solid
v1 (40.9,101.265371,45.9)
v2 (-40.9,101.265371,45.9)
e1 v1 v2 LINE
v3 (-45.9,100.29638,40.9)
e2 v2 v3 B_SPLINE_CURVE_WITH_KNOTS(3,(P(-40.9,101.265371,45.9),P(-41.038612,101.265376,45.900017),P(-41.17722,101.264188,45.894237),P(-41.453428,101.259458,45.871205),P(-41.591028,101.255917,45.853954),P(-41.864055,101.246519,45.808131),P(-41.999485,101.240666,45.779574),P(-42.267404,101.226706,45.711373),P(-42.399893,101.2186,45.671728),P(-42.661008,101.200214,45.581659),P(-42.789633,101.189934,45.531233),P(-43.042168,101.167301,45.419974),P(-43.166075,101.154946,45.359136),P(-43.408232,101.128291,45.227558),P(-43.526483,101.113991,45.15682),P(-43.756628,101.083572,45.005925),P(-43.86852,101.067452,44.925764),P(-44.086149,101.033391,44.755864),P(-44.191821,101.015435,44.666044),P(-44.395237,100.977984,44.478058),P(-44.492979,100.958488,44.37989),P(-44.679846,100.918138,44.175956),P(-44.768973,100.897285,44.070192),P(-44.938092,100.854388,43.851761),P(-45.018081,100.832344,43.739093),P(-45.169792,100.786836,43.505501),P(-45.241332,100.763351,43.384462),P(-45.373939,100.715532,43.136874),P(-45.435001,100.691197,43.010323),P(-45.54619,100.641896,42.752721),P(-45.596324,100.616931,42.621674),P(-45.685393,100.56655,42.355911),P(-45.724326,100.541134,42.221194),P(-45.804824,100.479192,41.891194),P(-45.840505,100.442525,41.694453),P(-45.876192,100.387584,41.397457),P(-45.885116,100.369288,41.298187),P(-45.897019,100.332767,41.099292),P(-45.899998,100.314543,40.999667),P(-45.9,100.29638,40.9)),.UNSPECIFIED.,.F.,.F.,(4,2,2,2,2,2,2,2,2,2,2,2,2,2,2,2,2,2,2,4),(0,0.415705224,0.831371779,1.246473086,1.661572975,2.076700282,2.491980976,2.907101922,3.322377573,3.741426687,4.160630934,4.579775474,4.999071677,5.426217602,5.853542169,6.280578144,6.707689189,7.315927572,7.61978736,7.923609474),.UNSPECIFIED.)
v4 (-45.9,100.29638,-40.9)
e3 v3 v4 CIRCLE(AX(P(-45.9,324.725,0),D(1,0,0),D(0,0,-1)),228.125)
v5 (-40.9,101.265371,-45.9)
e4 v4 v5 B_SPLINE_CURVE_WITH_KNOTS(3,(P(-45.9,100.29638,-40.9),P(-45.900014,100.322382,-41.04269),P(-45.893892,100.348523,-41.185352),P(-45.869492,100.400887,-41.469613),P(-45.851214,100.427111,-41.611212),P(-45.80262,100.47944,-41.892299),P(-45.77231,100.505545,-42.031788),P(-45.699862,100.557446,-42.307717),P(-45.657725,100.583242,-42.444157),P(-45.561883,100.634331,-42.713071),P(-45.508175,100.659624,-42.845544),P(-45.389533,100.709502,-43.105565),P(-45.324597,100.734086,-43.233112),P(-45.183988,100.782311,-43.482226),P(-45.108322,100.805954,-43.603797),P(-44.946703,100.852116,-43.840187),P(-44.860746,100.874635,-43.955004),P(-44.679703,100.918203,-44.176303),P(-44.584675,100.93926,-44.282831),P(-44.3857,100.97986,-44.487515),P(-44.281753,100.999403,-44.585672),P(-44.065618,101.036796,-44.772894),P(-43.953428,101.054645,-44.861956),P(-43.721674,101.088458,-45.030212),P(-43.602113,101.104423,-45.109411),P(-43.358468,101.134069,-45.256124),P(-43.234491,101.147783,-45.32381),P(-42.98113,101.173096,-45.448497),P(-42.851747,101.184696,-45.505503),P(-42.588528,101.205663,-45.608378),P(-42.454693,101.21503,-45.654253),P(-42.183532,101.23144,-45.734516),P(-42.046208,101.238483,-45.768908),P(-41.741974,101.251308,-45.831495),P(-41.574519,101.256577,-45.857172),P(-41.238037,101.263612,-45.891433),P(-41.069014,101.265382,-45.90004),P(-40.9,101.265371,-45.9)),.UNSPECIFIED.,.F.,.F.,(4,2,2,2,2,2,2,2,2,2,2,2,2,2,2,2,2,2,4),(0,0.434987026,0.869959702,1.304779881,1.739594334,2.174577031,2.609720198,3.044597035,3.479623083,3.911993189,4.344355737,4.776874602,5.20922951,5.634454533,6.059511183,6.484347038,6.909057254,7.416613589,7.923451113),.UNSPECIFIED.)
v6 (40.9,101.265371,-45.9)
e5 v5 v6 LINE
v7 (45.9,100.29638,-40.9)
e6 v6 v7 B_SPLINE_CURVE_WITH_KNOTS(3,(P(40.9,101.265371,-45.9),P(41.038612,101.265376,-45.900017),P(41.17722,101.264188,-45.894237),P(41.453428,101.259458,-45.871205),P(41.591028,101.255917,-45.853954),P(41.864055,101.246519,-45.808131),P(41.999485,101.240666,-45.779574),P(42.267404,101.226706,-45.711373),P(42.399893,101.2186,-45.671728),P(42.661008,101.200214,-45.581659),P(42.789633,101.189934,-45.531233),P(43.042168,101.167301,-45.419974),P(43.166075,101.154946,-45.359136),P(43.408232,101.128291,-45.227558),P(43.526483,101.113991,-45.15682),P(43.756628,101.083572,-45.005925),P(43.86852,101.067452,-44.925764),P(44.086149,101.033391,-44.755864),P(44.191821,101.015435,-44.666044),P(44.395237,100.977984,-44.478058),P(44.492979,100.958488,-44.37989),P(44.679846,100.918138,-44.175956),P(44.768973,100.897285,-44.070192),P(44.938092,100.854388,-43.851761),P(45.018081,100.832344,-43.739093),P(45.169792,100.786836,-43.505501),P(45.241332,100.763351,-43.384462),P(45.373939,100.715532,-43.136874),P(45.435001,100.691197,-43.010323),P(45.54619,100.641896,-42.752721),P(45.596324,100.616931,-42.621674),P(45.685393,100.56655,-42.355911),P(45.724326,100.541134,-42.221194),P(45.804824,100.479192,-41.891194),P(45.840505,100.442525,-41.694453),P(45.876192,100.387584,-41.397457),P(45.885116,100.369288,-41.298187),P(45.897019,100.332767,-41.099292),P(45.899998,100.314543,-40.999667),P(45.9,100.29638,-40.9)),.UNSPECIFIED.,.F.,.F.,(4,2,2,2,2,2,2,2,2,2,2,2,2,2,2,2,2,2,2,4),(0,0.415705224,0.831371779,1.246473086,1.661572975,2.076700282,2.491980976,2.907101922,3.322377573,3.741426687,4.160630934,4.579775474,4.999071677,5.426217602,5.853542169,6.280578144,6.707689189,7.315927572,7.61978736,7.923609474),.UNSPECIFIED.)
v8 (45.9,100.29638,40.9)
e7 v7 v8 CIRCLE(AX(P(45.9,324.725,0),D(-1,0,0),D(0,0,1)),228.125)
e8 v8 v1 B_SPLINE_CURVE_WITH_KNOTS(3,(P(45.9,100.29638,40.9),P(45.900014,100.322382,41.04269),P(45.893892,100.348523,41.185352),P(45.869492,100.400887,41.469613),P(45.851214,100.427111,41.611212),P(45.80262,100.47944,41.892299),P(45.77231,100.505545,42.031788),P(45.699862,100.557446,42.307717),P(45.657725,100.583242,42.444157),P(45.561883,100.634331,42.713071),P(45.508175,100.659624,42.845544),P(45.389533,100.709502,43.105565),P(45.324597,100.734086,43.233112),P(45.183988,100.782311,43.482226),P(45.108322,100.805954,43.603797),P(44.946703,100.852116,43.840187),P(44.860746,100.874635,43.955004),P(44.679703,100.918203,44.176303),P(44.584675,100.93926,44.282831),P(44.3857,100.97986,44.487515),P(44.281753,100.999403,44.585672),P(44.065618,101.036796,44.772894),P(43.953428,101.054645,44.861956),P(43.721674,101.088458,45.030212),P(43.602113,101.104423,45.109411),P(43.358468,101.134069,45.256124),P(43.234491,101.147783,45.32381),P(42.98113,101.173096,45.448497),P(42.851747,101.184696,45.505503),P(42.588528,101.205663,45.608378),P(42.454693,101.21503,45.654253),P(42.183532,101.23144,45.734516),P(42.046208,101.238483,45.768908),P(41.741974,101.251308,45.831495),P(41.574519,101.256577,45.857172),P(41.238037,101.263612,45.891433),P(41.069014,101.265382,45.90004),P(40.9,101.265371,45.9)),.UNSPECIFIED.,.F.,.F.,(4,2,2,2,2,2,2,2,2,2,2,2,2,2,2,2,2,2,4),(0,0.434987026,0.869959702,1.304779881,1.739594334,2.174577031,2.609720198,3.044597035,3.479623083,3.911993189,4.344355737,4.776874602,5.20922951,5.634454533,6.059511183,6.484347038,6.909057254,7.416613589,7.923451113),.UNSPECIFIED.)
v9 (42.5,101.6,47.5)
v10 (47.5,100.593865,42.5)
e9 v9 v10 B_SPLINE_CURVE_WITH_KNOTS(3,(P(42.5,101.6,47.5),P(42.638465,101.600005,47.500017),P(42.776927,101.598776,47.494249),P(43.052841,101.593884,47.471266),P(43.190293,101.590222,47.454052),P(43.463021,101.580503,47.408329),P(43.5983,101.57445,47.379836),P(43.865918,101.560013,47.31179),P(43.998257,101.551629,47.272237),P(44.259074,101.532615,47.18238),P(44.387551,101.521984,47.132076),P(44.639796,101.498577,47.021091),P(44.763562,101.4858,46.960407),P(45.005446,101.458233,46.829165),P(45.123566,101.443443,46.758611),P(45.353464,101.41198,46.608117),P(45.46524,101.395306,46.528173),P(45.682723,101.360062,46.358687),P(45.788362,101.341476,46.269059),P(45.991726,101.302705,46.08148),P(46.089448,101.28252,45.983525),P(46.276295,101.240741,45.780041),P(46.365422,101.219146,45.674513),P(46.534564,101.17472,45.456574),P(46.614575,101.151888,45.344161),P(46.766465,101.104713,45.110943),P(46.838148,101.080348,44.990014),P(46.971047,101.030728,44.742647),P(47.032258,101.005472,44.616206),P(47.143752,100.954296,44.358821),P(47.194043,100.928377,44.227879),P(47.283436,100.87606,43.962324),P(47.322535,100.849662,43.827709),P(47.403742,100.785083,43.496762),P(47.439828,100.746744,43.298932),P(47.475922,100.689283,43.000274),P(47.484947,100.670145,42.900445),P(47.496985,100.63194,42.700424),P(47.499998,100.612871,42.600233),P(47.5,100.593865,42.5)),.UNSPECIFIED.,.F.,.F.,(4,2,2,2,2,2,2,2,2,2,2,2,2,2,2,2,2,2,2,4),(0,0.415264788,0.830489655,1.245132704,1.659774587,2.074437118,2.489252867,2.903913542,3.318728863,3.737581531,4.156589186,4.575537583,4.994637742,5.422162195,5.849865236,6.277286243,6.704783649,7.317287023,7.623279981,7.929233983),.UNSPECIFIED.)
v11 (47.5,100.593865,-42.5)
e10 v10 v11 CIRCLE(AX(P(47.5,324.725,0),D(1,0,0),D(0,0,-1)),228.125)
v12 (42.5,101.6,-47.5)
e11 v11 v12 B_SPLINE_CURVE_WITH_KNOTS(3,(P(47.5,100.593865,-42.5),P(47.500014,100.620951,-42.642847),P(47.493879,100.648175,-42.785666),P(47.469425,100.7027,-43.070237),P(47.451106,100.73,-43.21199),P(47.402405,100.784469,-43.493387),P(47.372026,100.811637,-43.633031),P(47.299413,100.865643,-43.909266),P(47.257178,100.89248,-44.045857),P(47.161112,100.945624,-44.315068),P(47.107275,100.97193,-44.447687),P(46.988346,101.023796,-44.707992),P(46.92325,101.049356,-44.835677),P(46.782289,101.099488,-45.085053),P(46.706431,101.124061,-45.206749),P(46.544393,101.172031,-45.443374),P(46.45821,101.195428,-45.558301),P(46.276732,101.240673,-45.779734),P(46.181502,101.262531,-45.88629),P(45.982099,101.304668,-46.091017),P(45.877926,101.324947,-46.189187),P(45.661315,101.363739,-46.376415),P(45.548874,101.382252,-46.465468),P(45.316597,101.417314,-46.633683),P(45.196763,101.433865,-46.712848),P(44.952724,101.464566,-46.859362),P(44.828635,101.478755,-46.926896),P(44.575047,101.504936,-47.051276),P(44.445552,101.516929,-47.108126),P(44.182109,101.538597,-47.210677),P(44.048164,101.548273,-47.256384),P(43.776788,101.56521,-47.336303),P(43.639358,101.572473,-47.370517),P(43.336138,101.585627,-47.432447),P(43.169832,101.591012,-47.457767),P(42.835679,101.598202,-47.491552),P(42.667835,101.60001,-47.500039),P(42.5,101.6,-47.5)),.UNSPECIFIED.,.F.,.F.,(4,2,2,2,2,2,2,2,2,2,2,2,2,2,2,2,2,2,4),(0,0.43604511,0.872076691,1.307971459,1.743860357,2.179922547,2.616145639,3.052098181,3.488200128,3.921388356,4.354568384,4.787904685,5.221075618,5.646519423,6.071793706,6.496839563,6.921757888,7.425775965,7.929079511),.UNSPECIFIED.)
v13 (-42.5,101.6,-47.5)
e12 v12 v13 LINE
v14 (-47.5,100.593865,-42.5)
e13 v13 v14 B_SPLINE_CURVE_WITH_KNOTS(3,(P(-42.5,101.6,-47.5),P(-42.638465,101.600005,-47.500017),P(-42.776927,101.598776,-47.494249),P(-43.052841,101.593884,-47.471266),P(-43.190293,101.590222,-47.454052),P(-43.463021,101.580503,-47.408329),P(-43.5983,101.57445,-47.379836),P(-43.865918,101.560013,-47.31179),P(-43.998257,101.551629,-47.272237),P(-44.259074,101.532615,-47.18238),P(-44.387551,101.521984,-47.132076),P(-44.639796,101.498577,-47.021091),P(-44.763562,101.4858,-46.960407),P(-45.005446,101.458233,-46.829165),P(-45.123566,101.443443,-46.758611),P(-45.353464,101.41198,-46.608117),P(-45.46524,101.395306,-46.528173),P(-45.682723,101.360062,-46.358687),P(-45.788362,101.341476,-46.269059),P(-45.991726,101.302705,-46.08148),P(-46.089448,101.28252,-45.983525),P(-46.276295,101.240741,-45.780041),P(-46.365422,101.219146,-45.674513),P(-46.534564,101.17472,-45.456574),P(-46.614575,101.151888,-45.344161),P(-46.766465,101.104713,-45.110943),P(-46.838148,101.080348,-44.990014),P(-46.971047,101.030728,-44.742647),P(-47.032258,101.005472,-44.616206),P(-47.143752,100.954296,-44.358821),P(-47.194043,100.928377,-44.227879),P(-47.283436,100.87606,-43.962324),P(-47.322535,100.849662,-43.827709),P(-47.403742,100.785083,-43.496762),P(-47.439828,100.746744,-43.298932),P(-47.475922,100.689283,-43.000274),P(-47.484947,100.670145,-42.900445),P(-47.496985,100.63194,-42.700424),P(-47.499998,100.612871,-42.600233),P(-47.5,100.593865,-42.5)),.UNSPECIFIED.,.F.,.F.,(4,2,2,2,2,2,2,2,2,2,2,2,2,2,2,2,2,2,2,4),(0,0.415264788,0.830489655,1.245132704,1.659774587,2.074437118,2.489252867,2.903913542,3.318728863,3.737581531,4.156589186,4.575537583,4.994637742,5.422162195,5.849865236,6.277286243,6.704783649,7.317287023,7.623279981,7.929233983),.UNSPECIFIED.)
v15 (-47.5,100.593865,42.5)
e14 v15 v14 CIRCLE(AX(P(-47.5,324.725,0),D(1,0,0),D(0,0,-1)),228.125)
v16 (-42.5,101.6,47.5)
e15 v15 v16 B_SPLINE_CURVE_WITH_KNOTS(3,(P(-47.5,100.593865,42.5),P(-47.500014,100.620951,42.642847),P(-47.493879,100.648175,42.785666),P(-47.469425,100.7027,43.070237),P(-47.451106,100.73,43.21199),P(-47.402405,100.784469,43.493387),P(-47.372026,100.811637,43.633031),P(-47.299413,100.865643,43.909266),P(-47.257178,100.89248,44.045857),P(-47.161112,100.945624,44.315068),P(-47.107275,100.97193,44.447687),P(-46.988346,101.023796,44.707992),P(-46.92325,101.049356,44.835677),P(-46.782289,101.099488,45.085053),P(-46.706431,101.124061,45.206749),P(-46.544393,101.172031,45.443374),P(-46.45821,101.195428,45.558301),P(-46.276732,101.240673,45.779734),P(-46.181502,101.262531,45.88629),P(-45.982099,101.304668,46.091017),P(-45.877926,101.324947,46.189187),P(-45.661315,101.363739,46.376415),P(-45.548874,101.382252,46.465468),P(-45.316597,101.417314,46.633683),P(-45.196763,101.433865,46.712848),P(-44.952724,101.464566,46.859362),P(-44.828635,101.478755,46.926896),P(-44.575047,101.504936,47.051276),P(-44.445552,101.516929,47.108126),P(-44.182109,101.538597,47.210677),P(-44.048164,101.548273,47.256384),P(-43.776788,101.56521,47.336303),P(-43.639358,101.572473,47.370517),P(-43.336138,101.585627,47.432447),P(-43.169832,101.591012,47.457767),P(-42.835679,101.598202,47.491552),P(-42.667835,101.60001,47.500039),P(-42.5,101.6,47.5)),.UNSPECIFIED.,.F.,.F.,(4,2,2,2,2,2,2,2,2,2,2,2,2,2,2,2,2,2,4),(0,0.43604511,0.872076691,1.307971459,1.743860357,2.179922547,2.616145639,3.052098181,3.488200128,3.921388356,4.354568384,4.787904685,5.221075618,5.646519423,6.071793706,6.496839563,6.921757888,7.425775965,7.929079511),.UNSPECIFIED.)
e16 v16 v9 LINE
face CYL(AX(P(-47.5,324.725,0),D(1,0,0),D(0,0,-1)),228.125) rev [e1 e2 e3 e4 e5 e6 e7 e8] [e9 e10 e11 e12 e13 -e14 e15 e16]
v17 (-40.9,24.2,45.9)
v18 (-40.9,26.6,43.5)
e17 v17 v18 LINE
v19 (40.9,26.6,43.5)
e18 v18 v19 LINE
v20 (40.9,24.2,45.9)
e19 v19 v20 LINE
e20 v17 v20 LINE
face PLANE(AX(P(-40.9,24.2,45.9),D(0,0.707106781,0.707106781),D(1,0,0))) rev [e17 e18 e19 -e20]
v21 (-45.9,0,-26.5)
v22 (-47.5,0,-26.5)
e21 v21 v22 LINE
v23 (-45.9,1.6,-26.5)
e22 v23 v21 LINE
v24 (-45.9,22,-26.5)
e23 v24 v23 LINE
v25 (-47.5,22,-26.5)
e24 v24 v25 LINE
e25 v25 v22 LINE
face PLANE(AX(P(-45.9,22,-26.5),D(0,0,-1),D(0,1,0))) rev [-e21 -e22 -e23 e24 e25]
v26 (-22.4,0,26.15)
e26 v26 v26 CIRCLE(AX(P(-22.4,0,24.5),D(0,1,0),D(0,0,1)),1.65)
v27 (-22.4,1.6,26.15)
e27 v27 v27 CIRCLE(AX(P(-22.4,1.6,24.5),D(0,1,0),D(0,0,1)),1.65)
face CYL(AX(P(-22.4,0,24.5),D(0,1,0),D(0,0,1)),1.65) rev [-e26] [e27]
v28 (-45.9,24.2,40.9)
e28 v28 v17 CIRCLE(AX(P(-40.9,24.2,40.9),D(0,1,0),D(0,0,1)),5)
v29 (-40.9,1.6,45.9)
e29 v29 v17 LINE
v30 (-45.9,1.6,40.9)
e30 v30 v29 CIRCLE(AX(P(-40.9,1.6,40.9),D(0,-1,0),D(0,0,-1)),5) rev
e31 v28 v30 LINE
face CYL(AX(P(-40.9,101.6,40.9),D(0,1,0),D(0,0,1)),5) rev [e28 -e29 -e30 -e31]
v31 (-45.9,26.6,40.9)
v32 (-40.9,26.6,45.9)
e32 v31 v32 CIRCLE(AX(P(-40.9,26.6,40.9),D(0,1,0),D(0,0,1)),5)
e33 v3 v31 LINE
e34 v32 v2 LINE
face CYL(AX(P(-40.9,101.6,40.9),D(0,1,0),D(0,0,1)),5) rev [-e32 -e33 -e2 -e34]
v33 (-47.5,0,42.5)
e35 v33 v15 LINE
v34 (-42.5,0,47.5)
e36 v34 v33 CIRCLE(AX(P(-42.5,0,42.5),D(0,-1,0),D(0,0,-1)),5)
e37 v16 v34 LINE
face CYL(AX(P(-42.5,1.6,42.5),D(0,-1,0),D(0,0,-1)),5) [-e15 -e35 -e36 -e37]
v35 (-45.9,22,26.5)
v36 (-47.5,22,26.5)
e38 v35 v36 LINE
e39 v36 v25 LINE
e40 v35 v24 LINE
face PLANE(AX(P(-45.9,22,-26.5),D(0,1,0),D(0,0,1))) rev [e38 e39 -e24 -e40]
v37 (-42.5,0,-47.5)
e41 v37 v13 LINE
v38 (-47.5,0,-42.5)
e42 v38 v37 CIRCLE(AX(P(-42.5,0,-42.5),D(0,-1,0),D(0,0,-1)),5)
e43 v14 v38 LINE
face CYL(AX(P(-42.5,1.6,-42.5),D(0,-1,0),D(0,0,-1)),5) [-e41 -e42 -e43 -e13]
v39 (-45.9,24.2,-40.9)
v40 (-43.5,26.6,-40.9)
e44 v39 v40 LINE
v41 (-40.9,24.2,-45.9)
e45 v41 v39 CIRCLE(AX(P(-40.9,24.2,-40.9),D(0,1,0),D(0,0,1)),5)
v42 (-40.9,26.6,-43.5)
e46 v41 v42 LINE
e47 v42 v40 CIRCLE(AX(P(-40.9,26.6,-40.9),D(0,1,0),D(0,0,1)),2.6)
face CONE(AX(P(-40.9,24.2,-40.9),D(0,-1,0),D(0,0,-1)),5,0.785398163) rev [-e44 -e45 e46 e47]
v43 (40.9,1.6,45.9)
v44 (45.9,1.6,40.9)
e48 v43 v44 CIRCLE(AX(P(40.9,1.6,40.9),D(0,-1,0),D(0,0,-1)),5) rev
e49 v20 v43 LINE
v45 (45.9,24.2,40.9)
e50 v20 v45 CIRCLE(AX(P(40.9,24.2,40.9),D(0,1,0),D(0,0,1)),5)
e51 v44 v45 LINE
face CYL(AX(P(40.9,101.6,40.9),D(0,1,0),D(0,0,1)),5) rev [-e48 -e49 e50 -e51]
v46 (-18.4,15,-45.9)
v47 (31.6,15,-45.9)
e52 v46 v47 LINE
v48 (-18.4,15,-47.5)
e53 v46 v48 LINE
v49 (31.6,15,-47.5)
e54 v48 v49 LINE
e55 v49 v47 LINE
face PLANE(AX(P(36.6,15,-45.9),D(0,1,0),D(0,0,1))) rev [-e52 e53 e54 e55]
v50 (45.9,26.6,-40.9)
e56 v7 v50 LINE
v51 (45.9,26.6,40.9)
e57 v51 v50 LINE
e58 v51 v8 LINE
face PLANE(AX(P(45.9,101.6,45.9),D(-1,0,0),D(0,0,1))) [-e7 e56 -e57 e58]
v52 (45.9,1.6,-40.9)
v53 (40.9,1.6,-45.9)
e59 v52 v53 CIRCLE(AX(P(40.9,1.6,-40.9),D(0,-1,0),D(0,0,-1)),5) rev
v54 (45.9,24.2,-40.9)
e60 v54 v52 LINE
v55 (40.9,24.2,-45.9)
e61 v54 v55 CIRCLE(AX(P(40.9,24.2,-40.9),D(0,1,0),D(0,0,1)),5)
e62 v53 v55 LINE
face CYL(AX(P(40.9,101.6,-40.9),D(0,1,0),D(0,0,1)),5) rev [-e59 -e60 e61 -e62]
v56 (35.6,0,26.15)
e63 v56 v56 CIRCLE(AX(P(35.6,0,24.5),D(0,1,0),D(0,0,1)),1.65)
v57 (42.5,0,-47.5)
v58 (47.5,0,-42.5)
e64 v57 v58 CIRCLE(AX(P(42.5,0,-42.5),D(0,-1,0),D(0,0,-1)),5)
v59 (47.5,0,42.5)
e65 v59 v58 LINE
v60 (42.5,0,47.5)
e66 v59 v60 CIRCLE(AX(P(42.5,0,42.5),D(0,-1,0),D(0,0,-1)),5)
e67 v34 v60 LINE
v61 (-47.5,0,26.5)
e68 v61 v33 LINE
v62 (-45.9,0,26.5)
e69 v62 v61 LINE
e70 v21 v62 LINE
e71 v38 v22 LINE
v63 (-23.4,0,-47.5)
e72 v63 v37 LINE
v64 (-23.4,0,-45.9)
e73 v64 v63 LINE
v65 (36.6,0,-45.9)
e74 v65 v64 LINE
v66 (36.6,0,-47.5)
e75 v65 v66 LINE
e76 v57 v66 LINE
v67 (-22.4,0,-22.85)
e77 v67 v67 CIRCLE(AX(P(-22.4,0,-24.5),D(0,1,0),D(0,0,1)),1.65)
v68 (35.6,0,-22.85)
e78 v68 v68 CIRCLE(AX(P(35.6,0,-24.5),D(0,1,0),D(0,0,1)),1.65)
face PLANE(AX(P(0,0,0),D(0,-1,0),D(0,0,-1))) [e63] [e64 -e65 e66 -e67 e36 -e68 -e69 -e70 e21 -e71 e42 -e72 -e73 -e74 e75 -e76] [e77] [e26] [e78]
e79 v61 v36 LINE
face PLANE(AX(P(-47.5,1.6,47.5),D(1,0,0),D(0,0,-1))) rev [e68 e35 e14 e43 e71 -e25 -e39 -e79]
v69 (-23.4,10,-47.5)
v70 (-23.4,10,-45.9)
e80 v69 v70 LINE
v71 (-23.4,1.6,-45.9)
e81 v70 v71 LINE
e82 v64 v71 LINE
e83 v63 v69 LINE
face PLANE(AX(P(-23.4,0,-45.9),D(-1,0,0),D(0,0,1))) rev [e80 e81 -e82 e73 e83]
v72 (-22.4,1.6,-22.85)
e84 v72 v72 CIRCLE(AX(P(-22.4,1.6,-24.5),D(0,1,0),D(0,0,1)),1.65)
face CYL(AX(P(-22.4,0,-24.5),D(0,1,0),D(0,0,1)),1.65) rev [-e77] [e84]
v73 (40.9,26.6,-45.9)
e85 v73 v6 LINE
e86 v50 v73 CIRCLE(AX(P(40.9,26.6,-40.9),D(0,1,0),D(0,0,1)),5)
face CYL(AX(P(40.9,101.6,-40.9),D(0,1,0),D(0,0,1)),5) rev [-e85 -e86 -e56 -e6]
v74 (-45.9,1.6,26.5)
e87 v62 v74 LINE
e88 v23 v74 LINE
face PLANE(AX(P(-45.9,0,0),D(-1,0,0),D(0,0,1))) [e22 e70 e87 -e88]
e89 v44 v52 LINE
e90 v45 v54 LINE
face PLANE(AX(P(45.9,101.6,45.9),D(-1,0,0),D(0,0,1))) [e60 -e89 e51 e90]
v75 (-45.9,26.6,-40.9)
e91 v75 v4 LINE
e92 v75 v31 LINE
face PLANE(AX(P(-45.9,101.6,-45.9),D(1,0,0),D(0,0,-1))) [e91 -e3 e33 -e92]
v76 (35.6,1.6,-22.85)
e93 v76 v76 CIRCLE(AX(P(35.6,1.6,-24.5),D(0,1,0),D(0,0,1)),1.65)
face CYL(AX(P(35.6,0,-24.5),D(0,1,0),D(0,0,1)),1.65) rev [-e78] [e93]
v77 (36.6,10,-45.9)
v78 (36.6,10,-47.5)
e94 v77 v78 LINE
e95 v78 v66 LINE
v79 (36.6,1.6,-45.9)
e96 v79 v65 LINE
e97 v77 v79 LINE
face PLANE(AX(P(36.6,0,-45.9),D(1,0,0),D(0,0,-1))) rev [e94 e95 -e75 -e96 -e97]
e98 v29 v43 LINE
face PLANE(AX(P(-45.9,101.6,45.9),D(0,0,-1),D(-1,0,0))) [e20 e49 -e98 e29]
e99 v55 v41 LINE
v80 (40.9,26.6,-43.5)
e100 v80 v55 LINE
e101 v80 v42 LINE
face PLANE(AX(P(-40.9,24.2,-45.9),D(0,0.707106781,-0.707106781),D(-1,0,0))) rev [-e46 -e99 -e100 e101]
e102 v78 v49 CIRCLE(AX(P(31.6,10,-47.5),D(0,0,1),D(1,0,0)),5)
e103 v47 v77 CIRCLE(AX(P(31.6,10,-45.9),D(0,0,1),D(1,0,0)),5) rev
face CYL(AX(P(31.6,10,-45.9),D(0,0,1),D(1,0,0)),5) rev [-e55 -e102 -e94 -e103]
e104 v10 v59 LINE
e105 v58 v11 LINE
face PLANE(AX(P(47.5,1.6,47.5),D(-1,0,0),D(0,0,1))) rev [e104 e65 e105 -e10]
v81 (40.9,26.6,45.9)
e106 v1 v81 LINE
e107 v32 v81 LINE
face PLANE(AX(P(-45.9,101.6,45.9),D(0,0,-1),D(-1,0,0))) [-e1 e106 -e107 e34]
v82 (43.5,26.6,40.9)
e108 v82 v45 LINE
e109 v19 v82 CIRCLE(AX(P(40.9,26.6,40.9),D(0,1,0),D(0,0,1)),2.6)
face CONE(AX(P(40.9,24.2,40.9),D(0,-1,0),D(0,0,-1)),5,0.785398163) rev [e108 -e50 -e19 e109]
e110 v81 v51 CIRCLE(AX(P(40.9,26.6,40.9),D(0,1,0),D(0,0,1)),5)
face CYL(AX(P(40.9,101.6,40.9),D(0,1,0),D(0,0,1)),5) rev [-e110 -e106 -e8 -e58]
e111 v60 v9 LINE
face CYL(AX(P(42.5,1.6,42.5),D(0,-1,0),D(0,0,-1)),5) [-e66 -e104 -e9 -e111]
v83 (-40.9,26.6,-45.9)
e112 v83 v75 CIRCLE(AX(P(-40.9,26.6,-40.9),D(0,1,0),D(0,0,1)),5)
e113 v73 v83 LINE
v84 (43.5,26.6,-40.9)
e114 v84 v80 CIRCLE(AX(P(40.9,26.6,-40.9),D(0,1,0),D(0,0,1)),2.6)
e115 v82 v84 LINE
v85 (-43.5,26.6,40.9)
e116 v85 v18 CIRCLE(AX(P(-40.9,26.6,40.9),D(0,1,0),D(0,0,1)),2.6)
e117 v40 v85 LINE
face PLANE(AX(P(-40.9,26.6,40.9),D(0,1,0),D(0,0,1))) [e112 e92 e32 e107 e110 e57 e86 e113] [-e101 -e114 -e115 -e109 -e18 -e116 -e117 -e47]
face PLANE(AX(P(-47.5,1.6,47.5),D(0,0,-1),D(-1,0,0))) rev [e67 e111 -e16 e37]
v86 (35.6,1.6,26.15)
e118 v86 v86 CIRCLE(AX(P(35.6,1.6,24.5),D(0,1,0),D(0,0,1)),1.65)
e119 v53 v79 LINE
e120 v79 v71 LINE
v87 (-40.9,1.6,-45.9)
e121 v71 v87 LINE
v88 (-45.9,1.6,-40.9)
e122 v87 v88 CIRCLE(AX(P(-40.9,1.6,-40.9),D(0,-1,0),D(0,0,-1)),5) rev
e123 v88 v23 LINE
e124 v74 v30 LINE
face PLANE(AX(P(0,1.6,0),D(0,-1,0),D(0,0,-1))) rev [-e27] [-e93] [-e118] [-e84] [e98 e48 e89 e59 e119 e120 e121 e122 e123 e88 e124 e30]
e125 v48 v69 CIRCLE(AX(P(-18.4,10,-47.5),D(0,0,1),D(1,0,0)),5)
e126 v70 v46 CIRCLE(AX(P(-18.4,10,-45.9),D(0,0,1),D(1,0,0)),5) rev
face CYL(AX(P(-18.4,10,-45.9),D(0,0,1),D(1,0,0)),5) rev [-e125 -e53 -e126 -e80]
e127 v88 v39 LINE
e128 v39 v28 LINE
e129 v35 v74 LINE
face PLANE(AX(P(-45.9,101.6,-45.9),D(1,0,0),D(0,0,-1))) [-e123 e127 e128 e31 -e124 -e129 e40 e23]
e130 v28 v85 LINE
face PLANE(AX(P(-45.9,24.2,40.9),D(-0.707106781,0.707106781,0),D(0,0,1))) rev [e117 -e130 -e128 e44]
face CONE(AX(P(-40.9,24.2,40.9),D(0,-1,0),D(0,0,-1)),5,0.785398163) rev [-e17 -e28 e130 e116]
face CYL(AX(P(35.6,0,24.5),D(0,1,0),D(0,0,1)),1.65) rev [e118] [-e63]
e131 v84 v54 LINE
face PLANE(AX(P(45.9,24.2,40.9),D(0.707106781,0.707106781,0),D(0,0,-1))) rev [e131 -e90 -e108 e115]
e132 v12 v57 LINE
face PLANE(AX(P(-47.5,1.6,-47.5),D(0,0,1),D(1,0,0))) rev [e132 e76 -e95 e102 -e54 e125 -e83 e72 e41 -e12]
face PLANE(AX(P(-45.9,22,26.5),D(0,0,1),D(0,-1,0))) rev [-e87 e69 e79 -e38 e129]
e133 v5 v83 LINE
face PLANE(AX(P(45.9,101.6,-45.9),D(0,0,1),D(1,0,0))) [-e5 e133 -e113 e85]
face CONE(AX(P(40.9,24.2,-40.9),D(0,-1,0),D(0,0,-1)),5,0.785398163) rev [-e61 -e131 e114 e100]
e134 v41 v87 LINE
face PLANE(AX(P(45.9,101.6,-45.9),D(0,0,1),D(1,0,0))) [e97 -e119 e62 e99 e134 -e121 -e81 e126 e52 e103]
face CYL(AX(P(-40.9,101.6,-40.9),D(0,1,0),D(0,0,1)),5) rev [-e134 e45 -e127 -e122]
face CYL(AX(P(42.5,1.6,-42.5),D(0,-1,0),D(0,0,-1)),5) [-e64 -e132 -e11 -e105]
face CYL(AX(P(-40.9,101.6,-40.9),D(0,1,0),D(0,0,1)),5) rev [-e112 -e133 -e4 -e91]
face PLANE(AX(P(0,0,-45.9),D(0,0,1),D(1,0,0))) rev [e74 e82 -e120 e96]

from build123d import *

# Parameters (mm, degrees)
SKETCH1_W           = 95
SKETCH1_H           = 95
BOSS_EXTRUDE1_DEPTH = 1.6
SKETCH2_W           = 95
SKETCH2_H           = 95
SKETCH2_W_2         = 91.8
SKETCH2_H_2         = 91.8
BOSS_EXTRUDE2_DEPTH = 100
CUT_EXTRUDE1_DEPTH  = 147.982345879
FILLET1_R           = 5
SKETCH4_W           = 53
SKETCH4_H           = 22
CUT_EXTRUDE2_DEPTH  = 1.6
SKETCH5_R           = 1.65
CUT_EXTRUDE3_DEPTH  = 121.467838193
SKETCH6_W           = 60
SKETCH6_H           = 15
CUT_EXTRUDE4_DEPTH  = 1.6
FILLET2_R           = 5
BOSS_EXTRUDE3_START = 25
BOSS_EXTRUDE3_DEPTH = 2.4
CHAMFER1_SIZE       = 2.4


with BuildPart() as part:
    # Sketch1 → Boss-Extrude1 (new body)
    with BuildSketch(Plane(origin=(0, 0, 0), x_dir=(1, 0, 0), z_dir=(0, 1, 0))):
        Rectangle(SKETCH1_W, SKETCH1_H)
    extrude(amount=BOSS_EXTRUDE1_DEPTH)

    # Sketch2 → Boss-Extrude2 (add)
    with BuildSketch(Plane(origin=(0, 1.6, 0), x_dir=(1, 0, 0), z_dir=(0, 1, 0))):
        Rectangle(SKETCH2_W, SKETCH2_H)
        Rectangle(SKETCH2_W_2, SKETCH2_H_2, mode=Mode.SUBTRACT)
    extrude(amount=BOSS_EXTRUDE2_DEPTH)

    # Sketch3 → Cut-Extrude1 (cut, through all)
    with BuildSketch(Plane(origin=(47.5, 0, 0), x_dir=(0, 0, -1), z_dir=(1, 0, 0))):
        with BuildLine():
            Line((-47.5, 101.6), (47.5, 101.6))
            ThreePointArc((47.5, 101.6), (0, 96.6), (-47.5, 101.6))
        make_face()
    extrude(amount=-CUT_EXTRUDE1_DEPTH, mode=Mode.SUBTRACT)

    # Fillet1
    fillet1_edges = [part.edges().sort_by_distance(p)[0] for p in [
        (-45.9, 51.432685688, -45.9),
        (-45.9, 51.432685688, 45.9),
        (45.9, 51.432685688, -45.9),
        (45.9, 51.432685688, 45.9),
        (47.5, 50.8, 47.5),
        (-47.5, 50.8, 47.5),
        (-47.5, 50.8, -47.5),
        (47.5, 50.8, -47.5),
    ]]
    fillet(fillet1_edges, radius=FILLET1_R)

    # Sketch4 → Cut-Extrude2 (cut)
    with BuildSketch(Plane.ZY.offset(47.5)):
        with Locations((0, 11)):
            Rectangle(SKETCH4_W, SKETCH4_H)
    extrude(amount=-CUT_EXTRUDE2_DEPTH, mode=Mode.SUBTRACT)

    # Sketch5 → Cut-Extrude3 (cut, through all)
    with BuildSketch(Plane(origin=(0, 1.6, 0), x_dir=(1, 0, 0), z_dir=(0, 1, 0))):
        with Locations(Location((-22.4, 24.5, 0), (0, 0, 270))):
            Circle(SKETCH5_R)
        with Locations(Location((35.6, 24.5, 0), (0, 0, 270))):
            Circle(SKETCH5_R)
        with Locations(Location((35.6, -24.5, 0), (0, 0, 270))):
            Circle(SKETCH5_R)
        with Locations(Location((-22.4, -24.5, 0), (0, 0, 270))):
            Circle(SKETCH5_R)
    extrude(amount=-CUT_EXTRUDE3_DEPTH, mode=Mode.SUBTRACT)

    # Sketch6 → Cut-Extrude4 (cut)
    with BuildSketch(Plane(origin=(0, 0, -47.5), x_dir=(-1, 0, 0), z_dir=(0, 0, -1))):
        with Locations((-6.6, 7.5)):
            Rectangle(SKETCH6_W, SKETCH6_H)
    extrude(amount=-CUT_EXTRUDE4_DEPTH, mode=Mode.SUBTRACT)

    # Fillet2
    fillet2_edges = [part.edges().sort_by_distance(p)[0] for p in [
        (-23.4, 15, -46.7),
        (36.6, 15, -46.7),
    ]]
    fillet(fillet2_edges, radius=FILLET2_R)

    # Sketch7 → Boss-Extrude3 (add)
    with BuildSketch(Plane(origin=(0, 1.6, 0), x_dir=(1, 0, 0), z_dir=(0, 1, 0)).offset(BOSS_EXTRUDE3_START)):
        with BuildLine():
            Line((-40.9, -45.9), (40.9, -45.9))
            ThreePointArc((40.9, -45.9), (44.435533906, -44.435533906), (45.9, -40.9))
            Line((45.9, -40.9), (45.9, 40.9))
            ThreePointArc((45.9, 40.9), (44.435533906, 44.435533906), (40.9, 45.9))
            Line((40.9, 45.9), (36.6, 45.9))
            Line((36.6, 45.9), (-23.4, 45.9))
            Line((-23.4, 45.9), (-40.9, 45.9))
            ThreePointArc((-40.9, 45.9), (-44.435533906, 44.435533906), (-45.9, 40.9))
            Line((-45.9, 40.9), (-45.9, 26.5))
            Line((-45.9, 26.5), (-45.9, -26.5))
            Line((-45.9, -26.5), (-45.9, -40.9))
            ThreePointArc((-45.9, -40.9), (-44.435533906, -44.435533906), (-40.9, -45.9))
        make_face()
        with BuildLine():
            Line((-40.9, -43.5), (40.9, -43.5))
            ThreePointArc((40.9, -43.5), (42.738477631, -42.738477631), (43.5, -40.9))
            Line((43.5, -40.9), (43.5, 40.9))
            ThreePointArc((43.5, 40.9), (42.738477631, 42.738477631), (40.9, 43.5))
            Line((40.9, 43.5), (36.6, 43.5))
            Line((36.6, 43.5), (-23.4, 43.5))
            Line((-23.4, 43.5), (-40.9, 43.5))
            ThreePointArc((-40.9, 43.5), (-42.738477631, 42.738477631), (-43.5, 40.9))
            Line((-43.5, 40.9), (-43.5, 26.5))
            Line((-43.5, 26.5), (-43.5, -26.5))
            Line((-43.5, -26.5), (-43.5, -40.9))
            ThreePointArc((-43.5, -40.9), (-42.738477631, -42.738477631), (-40.9, -43.5))
        make_face(mode=Mode.SUBTRACT)
    extrude(amount=-BOSS_EXTRUDE3_DEPTH)

    # Chamfer1
    chamfer1_edges = [part.edges().sort_by_distance(p)[0] for p in [
        (0, 24.2, 43.5),
        (42.738477631, 24.2, 42.738477631),
        (-42.738477631, 24.2, 42.738477631),
        (43.5, 24.2, 0),
        (-43.5, 24.2, 0),
        (42.738477631, 24.2, -42.738477631),
        (-42.738477631, 24.2, -42.738477631),
        (0, 24.2, -43.5),
    ]]
    chamfer(chamfer1_edges, length=CHAMFER1_SIZE - 0.0001)  # a hair under: the kernel refuses the full size


solid = part.part
